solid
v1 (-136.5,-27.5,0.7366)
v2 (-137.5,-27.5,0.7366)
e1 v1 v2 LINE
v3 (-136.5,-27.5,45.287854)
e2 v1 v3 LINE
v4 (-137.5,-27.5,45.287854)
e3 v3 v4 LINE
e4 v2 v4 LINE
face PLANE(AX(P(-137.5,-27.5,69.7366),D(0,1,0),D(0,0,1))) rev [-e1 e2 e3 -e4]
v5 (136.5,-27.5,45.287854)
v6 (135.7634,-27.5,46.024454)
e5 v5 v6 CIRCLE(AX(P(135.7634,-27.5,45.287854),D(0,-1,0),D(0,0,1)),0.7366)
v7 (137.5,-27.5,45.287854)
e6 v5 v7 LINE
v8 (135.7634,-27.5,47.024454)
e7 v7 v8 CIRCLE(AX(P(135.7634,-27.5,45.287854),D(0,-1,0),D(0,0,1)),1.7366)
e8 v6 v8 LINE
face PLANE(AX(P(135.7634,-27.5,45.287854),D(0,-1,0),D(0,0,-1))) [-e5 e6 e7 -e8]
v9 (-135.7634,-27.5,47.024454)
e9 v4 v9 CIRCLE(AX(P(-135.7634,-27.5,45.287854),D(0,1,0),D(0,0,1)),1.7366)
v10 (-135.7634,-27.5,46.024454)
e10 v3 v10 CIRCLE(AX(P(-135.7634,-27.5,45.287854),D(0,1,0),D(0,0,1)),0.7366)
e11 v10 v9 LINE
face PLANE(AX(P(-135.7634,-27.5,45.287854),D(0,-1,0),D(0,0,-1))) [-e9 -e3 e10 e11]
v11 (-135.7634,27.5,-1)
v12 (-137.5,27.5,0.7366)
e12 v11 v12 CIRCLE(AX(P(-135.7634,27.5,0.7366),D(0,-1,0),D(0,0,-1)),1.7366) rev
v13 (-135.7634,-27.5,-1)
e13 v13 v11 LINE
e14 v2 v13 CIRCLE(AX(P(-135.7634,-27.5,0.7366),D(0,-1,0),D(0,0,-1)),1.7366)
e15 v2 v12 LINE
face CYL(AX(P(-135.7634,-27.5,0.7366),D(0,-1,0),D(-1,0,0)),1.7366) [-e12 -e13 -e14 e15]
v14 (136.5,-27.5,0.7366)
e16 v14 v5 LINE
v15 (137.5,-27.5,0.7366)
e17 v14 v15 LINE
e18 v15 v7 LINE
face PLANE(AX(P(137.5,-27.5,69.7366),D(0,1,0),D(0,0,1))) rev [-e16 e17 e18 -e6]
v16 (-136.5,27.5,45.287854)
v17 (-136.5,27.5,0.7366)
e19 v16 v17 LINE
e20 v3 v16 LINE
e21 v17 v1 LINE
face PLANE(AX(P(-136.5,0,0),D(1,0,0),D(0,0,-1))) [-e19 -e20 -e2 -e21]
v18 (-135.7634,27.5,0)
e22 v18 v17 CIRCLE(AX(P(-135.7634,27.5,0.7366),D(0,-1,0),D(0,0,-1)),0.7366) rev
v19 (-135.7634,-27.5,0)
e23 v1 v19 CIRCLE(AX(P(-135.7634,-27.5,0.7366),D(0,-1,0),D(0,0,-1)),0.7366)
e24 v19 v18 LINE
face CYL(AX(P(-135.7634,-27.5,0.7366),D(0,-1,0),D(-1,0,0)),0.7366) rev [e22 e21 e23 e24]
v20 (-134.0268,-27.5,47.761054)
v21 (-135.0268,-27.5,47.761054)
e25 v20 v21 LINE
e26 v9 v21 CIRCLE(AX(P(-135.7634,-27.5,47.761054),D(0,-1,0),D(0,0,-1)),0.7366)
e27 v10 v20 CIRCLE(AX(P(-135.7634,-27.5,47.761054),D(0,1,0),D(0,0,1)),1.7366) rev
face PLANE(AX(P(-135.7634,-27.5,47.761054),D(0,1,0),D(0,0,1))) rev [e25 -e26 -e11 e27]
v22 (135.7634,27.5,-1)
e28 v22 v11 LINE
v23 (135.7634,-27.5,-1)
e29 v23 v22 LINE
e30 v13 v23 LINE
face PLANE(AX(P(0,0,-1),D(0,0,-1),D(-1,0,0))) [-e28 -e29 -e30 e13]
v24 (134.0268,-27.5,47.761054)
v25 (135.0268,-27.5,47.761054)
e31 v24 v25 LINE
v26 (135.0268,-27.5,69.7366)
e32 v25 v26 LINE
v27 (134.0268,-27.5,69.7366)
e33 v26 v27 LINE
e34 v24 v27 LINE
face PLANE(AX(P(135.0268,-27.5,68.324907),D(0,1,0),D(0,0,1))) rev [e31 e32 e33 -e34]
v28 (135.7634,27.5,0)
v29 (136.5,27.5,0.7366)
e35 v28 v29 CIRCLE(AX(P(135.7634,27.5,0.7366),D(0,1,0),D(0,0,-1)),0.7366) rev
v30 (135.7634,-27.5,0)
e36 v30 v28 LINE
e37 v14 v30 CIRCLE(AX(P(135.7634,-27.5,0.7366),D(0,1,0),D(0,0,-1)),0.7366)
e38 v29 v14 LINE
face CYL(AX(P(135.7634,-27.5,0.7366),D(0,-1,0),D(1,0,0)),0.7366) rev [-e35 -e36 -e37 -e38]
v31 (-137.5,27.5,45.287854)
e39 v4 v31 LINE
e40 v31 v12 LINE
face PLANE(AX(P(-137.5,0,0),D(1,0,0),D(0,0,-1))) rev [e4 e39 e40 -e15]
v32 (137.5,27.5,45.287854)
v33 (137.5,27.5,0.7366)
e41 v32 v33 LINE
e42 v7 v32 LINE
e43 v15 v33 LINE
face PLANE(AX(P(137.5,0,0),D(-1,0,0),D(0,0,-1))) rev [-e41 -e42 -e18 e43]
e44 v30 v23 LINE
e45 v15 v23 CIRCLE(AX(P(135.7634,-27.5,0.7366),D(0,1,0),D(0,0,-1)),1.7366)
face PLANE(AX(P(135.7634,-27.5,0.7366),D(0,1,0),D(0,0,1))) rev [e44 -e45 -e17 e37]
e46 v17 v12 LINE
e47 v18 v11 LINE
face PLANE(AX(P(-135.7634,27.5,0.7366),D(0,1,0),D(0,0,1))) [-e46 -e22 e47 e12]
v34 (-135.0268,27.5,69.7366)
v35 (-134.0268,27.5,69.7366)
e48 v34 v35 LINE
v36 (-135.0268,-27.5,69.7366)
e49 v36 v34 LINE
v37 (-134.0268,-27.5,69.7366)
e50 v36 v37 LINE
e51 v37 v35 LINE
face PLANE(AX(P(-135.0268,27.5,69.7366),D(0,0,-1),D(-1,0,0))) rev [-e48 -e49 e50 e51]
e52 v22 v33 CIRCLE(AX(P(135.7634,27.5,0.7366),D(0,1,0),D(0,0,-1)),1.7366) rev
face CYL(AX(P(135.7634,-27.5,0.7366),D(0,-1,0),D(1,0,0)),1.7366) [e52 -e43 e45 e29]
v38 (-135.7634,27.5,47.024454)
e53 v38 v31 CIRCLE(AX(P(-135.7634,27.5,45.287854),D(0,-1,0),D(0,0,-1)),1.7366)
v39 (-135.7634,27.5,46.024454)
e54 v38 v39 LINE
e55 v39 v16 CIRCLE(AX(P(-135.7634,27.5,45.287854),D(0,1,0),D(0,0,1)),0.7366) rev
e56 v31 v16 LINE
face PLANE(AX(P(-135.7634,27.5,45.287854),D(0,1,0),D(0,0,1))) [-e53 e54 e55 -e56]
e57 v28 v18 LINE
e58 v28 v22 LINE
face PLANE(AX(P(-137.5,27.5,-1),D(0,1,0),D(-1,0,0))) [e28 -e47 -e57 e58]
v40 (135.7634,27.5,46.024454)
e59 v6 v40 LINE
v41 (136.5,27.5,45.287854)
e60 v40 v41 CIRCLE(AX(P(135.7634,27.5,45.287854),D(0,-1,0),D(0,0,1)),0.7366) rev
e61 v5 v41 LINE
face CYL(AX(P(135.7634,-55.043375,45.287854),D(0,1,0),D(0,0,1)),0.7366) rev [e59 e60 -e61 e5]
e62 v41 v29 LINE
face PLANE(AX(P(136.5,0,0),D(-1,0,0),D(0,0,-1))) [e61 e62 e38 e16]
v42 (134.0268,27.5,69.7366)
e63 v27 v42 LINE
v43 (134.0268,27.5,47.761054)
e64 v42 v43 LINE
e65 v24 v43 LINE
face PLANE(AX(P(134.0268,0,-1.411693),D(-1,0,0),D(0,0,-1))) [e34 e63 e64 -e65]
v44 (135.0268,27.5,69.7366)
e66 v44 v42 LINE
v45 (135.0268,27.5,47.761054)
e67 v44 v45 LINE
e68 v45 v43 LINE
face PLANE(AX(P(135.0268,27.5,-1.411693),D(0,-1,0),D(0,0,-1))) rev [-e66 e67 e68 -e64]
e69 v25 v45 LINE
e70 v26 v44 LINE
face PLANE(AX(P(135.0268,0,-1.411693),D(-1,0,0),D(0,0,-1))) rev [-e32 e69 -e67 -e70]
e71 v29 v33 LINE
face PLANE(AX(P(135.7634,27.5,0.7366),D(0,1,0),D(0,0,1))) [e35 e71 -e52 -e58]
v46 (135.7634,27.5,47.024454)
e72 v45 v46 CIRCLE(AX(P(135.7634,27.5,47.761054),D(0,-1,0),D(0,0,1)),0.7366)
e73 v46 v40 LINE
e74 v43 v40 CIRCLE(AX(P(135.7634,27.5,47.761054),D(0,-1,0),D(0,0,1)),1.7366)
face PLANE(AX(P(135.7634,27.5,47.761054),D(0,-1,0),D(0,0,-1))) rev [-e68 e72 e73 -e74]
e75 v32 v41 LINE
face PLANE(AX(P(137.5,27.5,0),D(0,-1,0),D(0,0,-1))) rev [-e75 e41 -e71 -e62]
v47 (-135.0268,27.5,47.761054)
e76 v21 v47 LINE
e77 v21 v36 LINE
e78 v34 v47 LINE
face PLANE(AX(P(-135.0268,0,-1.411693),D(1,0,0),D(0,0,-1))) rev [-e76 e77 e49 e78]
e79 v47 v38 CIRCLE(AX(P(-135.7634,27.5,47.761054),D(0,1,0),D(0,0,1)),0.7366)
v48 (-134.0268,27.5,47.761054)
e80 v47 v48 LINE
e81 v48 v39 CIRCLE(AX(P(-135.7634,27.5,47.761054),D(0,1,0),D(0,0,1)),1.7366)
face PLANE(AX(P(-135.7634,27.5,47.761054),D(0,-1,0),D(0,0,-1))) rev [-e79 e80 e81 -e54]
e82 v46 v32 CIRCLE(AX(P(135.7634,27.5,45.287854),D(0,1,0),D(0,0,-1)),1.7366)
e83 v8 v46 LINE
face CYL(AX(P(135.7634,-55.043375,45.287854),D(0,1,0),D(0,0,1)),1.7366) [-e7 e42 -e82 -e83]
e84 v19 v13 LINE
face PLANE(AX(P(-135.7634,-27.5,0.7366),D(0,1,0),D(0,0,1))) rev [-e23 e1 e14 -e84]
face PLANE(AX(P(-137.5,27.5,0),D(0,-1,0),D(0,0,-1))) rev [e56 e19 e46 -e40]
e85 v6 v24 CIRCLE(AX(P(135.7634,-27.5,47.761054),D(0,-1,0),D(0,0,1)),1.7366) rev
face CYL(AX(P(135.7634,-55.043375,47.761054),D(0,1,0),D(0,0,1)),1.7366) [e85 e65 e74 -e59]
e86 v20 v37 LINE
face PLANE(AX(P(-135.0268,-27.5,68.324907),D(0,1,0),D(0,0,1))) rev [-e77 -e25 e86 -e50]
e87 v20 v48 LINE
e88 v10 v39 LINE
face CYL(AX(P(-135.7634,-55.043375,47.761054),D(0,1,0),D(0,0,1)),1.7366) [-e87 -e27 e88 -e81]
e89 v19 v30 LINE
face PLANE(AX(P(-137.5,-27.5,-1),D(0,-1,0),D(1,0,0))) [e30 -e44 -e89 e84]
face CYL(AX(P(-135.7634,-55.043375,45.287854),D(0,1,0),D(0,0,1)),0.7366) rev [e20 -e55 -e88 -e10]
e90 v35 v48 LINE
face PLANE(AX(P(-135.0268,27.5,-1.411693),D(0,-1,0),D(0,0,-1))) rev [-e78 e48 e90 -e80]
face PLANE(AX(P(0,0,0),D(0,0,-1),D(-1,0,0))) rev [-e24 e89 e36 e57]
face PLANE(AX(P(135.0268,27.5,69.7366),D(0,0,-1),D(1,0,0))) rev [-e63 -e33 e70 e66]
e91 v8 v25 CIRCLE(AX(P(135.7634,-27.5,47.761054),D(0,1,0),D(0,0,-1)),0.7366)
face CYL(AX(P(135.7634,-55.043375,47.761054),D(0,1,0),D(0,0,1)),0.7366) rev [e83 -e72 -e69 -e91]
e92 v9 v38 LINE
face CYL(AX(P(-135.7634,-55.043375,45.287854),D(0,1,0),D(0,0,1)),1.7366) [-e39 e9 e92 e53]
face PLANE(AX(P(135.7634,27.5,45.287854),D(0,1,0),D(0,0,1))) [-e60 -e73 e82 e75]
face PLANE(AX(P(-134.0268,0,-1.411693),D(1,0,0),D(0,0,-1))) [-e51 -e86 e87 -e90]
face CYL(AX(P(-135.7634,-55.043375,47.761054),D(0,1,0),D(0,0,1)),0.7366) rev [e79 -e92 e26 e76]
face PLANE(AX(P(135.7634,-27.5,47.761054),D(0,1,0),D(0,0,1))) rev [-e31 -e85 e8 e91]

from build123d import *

# Parameters (mm, degrees)
SKETCH_1_W                       = 137.5
SKETCH_1_H                       = 55
SM_BASE_FLANGE_1_DEPTH           = 1
SM_EDGE_FLANGE_3_STRIP_W         = 5.4732
SM_EDGE_FLANGE_3_STRIP_H         = 1
SM_EDGE_FLANGE_3_STRIP_CUT_DEPTH = 55
SM_EDGE_FLANGE_3_DEPTH           = 55
OTHER_START                      = -27.5
OTHER_1_DEPTH                    = 55
OTHER_1_2_DEPTH                  = 55


# Read off the part's stored shape, not the designer's step: Изгиб1
# Sheet-metal steps are written as plain solids
with BuildPart() as part:
    # Sketch 1 → Базовая кромка1 (new body)
    with BuildSketch(Plane.XY):
        with Locations((-68.75, 0)):
            Rectangle(SKETCH_1_W, SKETCH_1_H)
    extrude(amount=-SM_BASE_FLANGE_1_DEPTH)

    # Ребро-кромка3 strip (across the edge) → Ребро-кромка3 strip cut (cut)
    with BuildSketch(Plane(origin=(-137.5, 27.5, 0), x_dir=(1, 0, 0), z_dir=(0, -1, 0))):
        with Locations((-1, -0.5)):
            Rectangle(SM_EDGE_FLANGE_3_STRIP_W, SM_EDGE_FLANGE_3_STRIP_H)
    extrude(amount=SM_EDGE_FLANGE_3_STRIP_CUT_DEPTH, mode=Mode.SUBTRACT)

    # Ребро-кромка3 section (across the edge) → Ребро-кромка3 (add)
    with BuildSketch(Plane(origin=(-137.5, 27.5, 0), x_dir=(1, 0, 0), z_dir=(0, -1, 0))):
        with BuildLine():
            Line((0, 0.7366), (0, 69.7366))
            Line((0, 69.7366), (1, 69.7366))
            Line((1, 69.7366), (1, 0.7366))
            ThreePointArc((1, 0.7366), (1.215745145, 0.215745145), (1.7366, 0))
            Line((1.7366, 0), (1.7366, -1))
            ThreePointArc((1.7366, -1), (0.508638364, -0.491361636), (0, 0.7366))
        make_face()
    extrude(amount=SM_EDGE_FLANGE_3_DEPTH)

    # Other 1 outline → Other 1 (cut)
    with BuildSketch(Plane(origin=(0, 0, 0), x_dir=(1, 0, 0), z_dir=(0, 1, 0)).offset(OTHER_START)):
        with BuildLine():
            ThreePointArc((-136.5, -46.86049542), (-137.228828115, -46.219680493), (-137.5, -45.287854329))
            Line((-137.5, -45.287854329), (-137.5, -69.7366))
            Line((-137.5, -69.7366), (-136.5, -69.7366))
            Line((-136.5, -69.7366), (-136.5, -46.86049542))
        make_face()
    extrude(amount=OTHER_1_DEPTH, mode=Mode.SUBTRACT)

    # Other 1 2 outline → Other 1 2 (add)
    with BuildSketch(Plane(origin=(0, 0, 0), x_dir=(1, 0, 0), z_dir=(0, 1, 0)).offset(OTHER_START)):
        with BuildLine():
            Line((-136.5, -45.287854329), (-136.5, -46.86049542))
            ThreePointArc((-136.5, -46.86049542), (-136.140713558, -46.982969086), (-135.7634, -47.024454329))
            ThreePointArc((-135.7634, -47.024454329), (-135.242545145, -47.240199474), (-135.0268, -47.761054329))
            Line((-135.0268, -47.761054329), (-135.0268, -69.7366))
            Line((-135.0268, -69.7366), (-134.0268, -69.7366))
            Line((-134.0268, -69.7366), (-134.0268, -47.761054329))
            ThreePointArc((-134.0268, -47.761054329), (-134.535438364, -46.533092693), (-135.7634, -46.024454329))
            ThreePointArc((-135.7634, -46.024454329), (-136.284254855, -45.808709184), (-136.5, -45.287854329))
        make_face()
    extrude(amount=OTHER_1_2_DEPTH)

    # Зеркальное отражение1: part across plane


with BuildPart() as part_1:
    add(part.part)
    add(part.part.mirror(Plane(origin=(0, -27.5, -1), x_dir=(0, 0, 1), z_dir=(1, 0, 0))))


solid = part_1.part
